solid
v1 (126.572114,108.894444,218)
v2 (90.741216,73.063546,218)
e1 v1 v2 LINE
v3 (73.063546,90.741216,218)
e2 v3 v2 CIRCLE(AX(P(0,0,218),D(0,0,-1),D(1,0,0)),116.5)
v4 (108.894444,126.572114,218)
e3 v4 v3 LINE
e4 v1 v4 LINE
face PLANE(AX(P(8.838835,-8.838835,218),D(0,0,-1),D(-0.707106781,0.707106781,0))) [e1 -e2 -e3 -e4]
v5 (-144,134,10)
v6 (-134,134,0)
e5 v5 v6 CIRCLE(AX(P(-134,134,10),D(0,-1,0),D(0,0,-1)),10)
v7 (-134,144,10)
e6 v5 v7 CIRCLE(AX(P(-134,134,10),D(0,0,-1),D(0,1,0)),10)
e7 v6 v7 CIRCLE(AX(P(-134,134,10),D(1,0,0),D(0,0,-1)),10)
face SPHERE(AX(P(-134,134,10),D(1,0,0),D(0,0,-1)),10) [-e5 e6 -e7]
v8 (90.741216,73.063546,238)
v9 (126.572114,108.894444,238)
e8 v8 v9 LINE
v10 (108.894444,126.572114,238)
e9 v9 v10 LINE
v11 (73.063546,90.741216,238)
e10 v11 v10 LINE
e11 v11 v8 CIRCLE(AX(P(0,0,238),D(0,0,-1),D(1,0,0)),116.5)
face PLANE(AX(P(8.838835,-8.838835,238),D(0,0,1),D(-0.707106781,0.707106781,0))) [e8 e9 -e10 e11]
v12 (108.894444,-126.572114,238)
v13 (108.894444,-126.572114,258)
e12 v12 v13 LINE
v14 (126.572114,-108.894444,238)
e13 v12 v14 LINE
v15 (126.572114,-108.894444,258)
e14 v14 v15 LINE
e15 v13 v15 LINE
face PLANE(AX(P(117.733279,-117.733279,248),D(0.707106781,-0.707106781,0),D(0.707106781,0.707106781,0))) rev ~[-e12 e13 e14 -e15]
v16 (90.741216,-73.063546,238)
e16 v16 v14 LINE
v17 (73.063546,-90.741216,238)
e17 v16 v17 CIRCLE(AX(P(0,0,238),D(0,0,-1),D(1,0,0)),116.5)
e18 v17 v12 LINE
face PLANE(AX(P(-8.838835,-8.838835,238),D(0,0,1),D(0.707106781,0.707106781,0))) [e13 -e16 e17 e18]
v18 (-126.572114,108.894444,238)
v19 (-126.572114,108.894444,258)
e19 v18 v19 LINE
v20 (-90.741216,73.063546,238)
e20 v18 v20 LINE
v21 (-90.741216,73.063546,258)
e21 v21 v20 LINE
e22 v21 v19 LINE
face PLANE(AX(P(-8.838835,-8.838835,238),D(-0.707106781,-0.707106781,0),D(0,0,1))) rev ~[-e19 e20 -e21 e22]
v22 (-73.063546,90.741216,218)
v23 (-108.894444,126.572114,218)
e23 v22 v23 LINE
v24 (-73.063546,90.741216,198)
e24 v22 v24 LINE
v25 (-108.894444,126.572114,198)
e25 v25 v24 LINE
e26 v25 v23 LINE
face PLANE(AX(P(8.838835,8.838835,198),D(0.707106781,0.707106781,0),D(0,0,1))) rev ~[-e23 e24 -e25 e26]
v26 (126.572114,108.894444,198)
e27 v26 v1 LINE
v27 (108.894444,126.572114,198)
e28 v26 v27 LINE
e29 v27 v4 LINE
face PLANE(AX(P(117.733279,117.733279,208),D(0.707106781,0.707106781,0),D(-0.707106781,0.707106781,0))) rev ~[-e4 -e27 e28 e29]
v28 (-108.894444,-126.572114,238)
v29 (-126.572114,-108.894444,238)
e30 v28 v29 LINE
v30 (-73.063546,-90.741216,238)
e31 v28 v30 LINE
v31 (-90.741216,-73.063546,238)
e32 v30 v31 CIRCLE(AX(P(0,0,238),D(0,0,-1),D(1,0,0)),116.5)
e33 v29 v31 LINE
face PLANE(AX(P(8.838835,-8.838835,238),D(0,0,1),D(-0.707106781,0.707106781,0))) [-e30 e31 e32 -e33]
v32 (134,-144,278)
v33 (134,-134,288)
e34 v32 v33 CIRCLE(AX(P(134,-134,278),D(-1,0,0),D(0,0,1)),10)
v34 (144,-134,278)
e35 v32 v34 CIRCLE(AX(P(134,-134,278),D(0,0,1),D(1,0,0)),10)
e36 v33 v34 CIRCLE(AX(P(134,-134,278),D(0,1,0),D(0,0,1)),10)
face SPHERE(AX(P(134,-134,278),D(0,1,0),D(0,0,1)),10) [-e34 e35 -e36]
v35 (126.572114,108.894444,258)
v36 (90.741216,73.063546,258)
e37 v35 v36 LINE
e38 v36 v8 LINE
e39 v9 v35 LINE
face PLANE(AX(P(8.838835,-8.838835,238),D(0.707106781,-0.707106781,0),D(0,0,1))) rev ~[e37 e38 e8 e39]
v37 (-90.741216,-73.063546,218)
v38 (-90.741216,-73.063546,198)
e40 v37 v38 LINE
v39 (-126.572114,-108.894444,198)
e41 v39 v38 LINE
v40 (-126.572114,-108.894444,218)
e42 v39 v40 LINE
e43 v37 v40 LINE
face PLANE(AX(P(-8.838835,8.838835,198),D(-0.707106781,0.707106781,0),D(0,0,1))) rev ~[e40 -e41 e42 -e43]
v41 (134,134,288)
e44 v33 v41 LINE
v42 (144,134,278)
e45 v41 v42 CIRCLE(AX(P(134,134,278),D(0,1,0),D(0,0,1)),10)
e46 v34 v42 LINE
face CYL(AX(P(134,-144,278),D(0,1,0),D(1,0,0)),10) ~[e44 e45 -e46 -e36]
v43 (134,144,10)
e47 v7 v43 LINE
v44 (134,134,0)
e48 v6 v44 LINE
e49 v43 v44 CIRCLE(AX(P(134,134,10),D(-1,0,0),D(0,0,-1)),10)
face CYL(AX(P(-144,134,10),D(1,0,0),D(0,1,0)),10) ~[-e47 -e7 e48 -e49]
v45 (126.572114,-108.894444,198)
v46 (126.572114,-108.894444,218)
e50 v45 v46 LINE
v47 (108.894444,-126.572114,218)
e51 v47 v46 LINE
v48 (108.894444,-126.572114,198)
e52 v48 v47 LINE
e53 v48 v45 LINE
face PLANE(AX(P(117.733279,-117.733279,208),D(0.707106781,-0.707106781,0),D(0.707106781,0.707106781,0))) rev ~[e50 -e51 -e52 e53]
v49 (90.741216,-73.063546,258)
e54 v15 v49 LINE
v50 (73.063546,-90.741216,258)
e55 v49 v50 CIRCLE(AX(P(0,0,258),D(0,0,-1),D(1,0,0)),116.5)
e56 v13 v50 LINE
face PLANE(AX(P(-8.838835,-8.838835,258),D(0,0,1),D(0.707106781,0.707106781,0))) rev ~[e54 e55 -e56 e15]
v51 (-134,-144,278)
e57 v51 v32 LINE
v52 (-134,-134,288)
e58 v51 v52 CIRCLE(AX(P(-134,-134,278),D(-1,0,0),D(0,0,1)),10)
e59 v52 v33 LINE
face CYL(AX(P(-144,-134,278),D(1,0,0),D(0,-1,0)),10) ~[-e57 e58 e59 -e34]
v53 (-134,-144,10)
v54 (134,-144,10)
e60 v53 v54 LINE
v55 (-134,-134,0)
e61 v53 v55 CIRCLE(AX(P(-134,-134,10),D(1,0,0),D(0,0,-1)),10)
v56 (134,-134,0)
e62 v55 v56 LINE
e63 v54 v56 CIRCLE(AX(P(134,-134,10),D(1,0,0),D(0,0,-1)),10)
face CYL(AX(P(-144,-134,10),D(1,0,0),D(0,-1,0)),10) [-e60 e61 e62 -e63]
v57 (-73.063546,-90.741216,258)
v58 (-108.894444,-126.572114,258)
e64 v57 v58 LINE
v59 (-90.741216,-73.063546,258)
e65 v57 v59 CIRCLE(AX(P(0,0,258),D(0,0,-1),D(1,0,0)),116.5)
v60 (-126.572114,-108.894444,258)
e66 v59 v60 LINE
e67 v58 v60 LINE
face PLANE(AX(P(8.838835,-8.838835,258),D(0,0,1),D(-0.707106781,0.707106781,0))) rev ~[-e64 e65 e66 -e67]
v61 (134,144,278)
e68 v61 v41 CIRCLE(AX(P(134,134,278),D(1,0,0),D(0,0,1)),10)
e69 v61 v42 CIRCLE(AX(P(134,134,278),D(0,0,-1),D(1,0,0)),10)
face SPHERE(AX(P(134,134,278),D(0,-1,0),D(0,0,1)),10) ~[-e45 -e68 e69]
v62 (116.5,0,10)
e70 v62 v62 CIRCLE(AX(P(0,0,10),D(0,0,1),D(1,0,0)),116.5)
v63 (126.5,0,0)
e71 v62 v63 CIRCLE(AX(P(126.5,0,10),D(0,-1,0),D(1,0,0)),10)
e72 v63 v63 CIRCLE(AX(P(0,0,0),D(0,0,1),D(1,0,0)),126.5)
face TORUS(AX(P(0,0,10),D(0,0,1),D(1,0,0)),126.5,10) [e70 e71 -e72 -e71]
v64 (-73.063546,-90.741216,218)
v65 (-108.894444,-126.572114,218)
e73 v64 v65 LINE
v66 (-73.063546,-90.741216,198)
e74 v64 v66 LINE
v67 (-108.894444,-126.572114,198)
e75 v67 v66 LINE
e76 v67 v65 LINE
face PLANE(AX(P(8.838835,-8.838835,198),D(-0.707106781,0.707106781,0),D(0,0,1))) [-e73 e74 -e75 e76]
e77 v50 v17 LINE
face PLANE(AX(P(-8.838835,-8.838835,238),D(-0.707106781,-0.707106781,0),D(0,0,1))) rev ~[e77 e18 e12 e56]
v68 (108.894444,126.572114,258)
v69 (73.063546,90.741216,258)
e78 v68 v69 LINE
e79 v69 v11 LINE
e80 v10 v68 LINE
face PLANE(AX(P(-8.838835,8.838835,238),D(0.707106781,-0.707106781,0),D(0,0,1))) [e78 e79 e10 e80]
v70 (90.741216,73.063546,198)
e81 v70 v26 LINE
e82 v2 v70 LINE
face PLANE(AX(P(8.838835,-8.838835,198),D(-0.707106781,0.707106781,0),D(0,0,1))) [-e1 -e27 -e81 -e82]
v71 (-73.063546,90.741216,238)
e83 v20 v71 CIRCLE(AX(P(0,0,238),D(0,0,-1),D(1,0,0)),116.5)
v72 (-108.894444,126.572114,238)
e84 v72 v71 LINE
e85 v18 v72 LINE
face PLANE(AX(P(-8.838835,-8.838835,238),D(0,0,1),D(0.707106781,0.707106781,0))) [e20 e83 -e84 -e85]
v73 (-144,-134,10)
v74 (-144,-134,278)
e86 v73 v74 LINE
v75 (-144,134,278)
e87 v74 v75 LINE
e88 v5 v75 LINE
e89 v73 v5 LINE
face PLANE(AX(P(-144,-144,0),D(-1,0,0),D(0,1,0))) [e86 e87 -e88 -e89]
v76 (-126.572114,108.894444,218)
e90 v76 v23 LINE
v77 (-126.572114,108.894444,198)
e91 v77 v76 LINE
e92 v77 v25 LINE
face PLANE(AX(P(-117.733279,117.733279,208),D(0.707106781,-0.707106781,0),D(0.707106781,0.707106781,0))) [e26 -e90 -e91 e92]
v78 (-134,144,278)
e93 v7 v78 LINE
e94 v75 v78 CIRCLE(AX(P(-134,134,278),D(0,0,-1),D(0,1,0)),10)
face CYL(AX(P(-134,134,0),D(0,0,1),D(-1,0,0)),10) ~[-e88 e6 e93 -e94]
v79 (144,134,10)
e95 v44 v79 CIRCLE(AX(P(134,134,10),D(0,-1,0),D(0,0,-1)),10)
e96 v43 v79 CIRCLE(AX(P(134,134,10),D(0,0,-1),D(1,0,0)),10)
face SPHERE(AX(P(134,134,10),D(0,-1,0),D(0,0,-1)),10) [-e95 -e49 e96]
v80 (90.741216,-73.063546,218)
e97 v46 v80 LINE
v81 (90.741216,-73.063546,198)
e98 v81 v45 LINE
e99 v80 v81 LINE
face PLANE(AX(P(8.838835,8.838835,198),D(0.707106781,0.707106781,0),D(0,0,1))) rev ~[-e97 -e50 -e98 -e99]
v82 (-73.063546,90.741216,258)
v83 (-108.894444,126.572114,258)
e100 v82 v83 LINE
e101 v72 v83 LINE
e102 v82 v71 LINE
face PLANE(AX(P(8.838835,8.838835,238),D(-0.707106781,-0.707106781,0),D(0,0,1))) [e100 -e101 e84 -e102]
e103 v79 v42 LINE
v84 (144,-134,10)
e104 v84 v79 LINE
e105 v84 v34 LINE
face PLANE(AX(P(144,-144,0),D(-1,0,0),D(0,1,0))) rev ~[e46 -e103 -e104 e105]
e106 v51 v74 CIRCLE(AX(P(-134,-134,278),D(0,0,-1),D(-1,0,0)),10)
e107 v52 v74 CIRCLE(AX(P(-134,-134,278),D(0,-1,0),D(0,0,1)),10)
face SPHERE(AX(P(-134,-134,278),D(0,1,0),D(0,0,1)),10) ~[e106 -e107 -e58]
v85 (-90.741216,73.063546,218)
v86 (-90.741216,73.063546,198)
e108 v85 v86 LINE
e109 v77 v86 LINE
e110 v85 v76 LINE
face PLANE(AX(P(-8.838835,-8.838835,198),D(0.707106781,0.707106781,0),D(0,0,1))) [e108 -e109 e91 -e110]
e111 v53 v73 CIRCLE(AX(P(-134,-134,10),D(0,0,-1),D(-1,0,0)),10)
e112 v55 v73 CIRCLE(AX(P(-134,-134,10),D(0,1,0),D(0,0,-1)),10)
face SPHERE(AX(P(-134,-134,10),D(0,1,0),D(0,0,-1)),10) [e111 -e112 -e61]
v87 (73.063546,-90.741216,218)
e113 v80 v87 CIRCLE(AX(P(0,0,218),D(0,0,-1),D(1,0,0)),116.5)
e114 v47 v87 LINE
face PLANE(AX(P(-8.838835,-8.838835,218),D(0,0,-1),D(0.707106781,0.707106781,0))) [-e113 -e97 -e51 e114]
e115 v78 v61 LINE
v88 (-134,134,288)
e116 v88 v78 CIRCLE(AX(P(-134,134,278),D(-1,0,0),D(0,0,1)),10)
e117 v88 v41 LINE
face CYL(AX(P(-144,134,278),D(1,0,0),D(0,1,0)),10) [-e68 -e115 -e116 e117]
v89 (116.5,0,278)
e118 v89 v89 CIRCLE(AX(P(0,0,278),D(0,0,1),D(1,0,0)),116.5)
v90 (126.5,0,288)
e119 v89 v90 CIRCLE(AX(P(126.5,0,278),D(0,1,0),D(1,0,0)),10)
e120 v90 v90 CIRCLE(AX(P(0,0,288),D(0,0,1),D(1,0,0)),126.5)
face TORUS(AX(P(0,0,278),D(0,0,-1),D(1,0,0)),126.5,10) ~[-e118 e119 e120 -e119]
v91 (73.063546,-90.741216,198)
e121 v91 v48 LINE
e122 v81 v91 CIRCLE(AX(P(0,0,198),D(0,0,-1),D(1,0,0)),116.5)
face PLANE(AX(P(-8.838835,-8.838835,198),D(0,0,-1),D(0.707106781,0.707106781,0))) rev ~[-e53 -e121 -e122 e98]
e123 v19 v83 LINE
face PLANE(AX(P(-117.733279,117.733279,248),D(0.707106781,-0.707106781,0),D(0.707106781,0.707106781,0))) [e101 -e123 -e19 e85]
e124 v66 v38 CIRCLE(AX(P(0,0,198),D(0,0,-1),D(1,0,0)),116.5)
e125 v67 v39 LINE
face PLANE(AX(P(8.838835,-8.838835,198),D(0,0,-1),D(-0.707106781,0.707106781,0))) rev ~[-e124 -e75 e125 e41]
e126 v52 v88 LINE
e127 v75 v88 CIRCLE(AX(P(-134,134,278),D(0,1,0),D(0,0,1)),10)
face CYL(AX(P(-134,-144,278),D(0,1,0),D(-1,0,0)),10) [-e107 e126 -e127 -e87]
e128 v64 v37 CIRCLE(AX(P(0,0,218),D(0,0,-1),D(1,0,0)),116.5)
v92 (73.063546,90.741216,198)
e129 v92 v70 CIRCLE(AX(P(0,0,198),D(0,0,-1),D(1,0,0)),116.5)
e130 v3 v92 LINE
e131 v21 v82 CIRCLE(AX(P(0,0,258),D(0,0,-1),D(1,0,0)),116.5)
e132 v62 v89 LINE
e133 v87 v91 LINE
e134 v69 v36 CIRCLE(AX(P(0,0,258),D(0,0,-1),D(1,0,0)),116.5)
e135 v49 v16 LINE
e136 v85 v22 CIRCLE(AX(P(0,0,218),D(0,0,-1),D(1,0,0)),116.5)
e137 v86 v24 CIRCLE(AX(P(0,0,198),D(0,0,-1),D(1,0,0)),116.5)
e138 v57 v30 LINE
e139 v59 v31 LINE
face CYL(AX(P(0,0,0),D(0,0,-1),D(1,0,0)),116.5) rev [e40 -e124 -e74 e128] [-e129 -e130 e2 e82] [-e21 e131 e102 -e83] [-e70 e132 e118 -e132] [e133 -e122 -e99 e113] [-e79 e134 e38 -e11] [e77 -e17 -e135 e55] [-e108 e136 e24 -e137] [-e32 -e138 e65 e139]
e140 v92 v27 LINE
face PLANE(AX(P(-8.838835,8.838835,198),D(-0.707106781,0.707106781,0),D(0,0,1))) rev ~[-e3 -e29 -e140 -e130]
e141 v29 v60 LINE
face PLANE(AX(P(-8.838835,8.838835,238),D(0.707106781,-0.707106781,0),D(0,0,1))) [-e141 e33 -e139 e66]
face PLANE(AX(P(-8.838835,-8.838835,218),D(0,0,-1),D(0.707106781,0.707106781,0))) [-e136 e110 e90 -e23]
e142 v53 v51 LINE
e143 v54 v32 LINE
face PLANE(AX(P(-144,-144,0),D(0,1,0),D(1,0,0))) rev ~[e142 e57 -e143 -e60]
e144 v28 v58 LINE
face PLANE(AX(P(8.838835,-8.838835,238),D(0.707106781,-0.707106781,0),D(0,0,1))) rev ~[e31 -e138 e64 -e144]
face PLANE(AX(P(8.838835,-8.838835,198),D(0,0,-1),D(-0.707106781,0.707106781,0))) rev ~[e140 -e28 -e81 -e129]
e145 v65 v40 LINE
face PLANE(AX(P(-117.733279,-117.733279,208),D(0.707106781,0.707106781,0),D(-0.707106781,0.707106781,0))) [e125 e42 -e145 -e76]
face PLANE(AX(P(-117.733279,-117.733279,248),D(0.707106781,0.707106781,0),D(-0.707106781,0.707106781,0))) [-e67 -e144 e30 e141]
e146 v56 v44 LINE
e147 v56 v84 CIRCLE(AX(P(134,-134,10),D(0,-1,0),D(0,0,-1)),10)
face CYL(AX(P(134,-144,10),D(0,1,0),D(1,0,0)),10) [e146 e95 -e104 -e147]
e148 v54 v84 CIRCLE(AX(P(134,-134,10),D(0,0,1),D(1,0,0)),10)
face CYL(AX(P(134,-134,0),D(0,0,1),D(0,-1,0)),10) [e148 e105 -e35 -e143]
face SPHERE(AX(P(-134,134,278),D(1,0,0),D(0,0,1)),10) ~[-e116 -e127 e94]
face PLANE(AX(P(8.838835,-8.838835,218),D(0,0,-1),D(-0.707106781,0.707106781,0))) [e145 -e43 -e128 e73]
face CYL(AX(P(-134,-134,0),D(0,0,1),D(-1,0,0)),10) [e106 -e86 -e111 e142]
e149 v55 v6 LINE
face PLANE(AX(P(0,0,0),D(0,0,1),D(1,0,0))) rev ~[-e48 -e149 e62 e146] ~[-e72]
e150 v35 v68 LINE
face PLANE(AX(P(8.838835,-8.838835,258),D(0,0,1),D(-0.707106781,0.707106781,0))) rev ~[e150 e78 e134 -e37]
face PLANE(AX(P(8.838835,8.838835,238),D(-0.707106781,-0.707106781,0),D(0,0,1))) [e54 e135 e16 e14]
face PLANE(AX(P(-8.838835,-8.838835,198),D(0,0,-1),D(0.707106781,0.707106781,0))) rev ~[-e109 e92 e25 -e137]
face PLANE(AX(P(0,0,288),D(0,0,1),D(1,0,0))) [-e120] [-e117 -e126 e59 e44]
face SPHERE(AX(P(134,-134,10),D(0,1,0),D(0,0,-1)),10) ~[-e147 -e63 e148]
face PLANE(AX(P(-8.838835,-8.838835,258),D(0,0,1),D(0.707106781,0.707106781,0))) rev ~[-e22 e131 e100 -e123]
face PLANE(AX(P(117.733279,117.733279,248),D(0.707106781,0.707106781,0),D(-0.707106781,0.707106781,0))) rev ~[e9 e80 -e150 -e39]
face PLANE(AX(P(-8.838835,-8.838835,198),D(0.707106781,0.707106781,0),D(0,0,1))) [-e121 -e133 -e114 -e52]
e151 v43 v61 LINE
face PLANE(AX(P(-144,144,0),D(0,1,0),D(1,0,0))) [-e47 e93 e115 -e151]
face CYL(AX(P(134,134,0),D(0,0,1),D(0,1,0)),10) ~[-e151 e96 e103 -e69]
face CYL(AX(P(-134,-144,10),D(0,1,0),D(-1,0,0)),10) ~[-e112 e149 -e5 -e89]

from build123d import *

# Parameters (mm, degrees)
F0_W     = 288
F0_H     = 288
F0_R     = 116.5
F1_DEPTH = 288
F2_R     = 10
F4_W     = 25
F4_H     = 20
F5_DEPTH = 166.5
F7_W     = 25
F7_H     = 20
F8_DEPTH = 166.5


with BuildPart() as f1:
    # F0 (on Top) → F1 (new body)
    with BuildSketch(Plane.XY):
        Rectangle(F0_W, F0_H)
        Circle(F0_R, mode=Mode.SUBTRACT)
    extrude(amount=F1_DEPTH)

    # F2
    f2_edges = [f1.edges().sort_by_distance(p)[0] for p in [
        (144, 0, 288),
        (0, 144, 288),
        (-144, 0, 288),
        (0, -144, 288),
        (-116.5, 0, 288),
        (144, 0, 0),
        (0, 144, 0),
        (-144, 0, 0),
        (0, -144, 0),
        (-116.5, 0, 0),
        (-144, 144, 144),
        (-144, -144, 144),
        (144, -144, 144),
        (144, 144, 144),
    ]]
    fillet(f2_edges, radius=F2_R)

    # F4 (on face) → F5 (cut, symmetric)
    with BuildSketch(Plane(origin=(0, 0, 0), x_dir=(-0.7071067812, 0.7071067812, 0), z_dir=(0.7071067812, 0.7071067812, 0))):
        with Locations((0, 248)):
            Rectangle(F4_W, F4_H)
        with Locations((0, 208)):
            Rectangle(F4_W, F4_H)
    extrude(amount=F5_DEPTH, both=True, mode=Mode.SUBTRACT)

    # F7 (on face) → F8 (cut, symmetric)
    with BuildSketch(Plane(origin=(0, 0, 0), x_dir=(0.7071067812, 0.7071067812, 0), z_dir=(0.7071067812, -0.7071067812, 0))):
        with Locations((0, 248)):
            Rectangle(F7_W, F7_H)
        with Locations((0, 208)):
            Rectangle(F7_W, F7_H)
    extrude(amount=F8_DEPTH, both=True, mode=Mode.SUBTRACT)


solid = f1.part
